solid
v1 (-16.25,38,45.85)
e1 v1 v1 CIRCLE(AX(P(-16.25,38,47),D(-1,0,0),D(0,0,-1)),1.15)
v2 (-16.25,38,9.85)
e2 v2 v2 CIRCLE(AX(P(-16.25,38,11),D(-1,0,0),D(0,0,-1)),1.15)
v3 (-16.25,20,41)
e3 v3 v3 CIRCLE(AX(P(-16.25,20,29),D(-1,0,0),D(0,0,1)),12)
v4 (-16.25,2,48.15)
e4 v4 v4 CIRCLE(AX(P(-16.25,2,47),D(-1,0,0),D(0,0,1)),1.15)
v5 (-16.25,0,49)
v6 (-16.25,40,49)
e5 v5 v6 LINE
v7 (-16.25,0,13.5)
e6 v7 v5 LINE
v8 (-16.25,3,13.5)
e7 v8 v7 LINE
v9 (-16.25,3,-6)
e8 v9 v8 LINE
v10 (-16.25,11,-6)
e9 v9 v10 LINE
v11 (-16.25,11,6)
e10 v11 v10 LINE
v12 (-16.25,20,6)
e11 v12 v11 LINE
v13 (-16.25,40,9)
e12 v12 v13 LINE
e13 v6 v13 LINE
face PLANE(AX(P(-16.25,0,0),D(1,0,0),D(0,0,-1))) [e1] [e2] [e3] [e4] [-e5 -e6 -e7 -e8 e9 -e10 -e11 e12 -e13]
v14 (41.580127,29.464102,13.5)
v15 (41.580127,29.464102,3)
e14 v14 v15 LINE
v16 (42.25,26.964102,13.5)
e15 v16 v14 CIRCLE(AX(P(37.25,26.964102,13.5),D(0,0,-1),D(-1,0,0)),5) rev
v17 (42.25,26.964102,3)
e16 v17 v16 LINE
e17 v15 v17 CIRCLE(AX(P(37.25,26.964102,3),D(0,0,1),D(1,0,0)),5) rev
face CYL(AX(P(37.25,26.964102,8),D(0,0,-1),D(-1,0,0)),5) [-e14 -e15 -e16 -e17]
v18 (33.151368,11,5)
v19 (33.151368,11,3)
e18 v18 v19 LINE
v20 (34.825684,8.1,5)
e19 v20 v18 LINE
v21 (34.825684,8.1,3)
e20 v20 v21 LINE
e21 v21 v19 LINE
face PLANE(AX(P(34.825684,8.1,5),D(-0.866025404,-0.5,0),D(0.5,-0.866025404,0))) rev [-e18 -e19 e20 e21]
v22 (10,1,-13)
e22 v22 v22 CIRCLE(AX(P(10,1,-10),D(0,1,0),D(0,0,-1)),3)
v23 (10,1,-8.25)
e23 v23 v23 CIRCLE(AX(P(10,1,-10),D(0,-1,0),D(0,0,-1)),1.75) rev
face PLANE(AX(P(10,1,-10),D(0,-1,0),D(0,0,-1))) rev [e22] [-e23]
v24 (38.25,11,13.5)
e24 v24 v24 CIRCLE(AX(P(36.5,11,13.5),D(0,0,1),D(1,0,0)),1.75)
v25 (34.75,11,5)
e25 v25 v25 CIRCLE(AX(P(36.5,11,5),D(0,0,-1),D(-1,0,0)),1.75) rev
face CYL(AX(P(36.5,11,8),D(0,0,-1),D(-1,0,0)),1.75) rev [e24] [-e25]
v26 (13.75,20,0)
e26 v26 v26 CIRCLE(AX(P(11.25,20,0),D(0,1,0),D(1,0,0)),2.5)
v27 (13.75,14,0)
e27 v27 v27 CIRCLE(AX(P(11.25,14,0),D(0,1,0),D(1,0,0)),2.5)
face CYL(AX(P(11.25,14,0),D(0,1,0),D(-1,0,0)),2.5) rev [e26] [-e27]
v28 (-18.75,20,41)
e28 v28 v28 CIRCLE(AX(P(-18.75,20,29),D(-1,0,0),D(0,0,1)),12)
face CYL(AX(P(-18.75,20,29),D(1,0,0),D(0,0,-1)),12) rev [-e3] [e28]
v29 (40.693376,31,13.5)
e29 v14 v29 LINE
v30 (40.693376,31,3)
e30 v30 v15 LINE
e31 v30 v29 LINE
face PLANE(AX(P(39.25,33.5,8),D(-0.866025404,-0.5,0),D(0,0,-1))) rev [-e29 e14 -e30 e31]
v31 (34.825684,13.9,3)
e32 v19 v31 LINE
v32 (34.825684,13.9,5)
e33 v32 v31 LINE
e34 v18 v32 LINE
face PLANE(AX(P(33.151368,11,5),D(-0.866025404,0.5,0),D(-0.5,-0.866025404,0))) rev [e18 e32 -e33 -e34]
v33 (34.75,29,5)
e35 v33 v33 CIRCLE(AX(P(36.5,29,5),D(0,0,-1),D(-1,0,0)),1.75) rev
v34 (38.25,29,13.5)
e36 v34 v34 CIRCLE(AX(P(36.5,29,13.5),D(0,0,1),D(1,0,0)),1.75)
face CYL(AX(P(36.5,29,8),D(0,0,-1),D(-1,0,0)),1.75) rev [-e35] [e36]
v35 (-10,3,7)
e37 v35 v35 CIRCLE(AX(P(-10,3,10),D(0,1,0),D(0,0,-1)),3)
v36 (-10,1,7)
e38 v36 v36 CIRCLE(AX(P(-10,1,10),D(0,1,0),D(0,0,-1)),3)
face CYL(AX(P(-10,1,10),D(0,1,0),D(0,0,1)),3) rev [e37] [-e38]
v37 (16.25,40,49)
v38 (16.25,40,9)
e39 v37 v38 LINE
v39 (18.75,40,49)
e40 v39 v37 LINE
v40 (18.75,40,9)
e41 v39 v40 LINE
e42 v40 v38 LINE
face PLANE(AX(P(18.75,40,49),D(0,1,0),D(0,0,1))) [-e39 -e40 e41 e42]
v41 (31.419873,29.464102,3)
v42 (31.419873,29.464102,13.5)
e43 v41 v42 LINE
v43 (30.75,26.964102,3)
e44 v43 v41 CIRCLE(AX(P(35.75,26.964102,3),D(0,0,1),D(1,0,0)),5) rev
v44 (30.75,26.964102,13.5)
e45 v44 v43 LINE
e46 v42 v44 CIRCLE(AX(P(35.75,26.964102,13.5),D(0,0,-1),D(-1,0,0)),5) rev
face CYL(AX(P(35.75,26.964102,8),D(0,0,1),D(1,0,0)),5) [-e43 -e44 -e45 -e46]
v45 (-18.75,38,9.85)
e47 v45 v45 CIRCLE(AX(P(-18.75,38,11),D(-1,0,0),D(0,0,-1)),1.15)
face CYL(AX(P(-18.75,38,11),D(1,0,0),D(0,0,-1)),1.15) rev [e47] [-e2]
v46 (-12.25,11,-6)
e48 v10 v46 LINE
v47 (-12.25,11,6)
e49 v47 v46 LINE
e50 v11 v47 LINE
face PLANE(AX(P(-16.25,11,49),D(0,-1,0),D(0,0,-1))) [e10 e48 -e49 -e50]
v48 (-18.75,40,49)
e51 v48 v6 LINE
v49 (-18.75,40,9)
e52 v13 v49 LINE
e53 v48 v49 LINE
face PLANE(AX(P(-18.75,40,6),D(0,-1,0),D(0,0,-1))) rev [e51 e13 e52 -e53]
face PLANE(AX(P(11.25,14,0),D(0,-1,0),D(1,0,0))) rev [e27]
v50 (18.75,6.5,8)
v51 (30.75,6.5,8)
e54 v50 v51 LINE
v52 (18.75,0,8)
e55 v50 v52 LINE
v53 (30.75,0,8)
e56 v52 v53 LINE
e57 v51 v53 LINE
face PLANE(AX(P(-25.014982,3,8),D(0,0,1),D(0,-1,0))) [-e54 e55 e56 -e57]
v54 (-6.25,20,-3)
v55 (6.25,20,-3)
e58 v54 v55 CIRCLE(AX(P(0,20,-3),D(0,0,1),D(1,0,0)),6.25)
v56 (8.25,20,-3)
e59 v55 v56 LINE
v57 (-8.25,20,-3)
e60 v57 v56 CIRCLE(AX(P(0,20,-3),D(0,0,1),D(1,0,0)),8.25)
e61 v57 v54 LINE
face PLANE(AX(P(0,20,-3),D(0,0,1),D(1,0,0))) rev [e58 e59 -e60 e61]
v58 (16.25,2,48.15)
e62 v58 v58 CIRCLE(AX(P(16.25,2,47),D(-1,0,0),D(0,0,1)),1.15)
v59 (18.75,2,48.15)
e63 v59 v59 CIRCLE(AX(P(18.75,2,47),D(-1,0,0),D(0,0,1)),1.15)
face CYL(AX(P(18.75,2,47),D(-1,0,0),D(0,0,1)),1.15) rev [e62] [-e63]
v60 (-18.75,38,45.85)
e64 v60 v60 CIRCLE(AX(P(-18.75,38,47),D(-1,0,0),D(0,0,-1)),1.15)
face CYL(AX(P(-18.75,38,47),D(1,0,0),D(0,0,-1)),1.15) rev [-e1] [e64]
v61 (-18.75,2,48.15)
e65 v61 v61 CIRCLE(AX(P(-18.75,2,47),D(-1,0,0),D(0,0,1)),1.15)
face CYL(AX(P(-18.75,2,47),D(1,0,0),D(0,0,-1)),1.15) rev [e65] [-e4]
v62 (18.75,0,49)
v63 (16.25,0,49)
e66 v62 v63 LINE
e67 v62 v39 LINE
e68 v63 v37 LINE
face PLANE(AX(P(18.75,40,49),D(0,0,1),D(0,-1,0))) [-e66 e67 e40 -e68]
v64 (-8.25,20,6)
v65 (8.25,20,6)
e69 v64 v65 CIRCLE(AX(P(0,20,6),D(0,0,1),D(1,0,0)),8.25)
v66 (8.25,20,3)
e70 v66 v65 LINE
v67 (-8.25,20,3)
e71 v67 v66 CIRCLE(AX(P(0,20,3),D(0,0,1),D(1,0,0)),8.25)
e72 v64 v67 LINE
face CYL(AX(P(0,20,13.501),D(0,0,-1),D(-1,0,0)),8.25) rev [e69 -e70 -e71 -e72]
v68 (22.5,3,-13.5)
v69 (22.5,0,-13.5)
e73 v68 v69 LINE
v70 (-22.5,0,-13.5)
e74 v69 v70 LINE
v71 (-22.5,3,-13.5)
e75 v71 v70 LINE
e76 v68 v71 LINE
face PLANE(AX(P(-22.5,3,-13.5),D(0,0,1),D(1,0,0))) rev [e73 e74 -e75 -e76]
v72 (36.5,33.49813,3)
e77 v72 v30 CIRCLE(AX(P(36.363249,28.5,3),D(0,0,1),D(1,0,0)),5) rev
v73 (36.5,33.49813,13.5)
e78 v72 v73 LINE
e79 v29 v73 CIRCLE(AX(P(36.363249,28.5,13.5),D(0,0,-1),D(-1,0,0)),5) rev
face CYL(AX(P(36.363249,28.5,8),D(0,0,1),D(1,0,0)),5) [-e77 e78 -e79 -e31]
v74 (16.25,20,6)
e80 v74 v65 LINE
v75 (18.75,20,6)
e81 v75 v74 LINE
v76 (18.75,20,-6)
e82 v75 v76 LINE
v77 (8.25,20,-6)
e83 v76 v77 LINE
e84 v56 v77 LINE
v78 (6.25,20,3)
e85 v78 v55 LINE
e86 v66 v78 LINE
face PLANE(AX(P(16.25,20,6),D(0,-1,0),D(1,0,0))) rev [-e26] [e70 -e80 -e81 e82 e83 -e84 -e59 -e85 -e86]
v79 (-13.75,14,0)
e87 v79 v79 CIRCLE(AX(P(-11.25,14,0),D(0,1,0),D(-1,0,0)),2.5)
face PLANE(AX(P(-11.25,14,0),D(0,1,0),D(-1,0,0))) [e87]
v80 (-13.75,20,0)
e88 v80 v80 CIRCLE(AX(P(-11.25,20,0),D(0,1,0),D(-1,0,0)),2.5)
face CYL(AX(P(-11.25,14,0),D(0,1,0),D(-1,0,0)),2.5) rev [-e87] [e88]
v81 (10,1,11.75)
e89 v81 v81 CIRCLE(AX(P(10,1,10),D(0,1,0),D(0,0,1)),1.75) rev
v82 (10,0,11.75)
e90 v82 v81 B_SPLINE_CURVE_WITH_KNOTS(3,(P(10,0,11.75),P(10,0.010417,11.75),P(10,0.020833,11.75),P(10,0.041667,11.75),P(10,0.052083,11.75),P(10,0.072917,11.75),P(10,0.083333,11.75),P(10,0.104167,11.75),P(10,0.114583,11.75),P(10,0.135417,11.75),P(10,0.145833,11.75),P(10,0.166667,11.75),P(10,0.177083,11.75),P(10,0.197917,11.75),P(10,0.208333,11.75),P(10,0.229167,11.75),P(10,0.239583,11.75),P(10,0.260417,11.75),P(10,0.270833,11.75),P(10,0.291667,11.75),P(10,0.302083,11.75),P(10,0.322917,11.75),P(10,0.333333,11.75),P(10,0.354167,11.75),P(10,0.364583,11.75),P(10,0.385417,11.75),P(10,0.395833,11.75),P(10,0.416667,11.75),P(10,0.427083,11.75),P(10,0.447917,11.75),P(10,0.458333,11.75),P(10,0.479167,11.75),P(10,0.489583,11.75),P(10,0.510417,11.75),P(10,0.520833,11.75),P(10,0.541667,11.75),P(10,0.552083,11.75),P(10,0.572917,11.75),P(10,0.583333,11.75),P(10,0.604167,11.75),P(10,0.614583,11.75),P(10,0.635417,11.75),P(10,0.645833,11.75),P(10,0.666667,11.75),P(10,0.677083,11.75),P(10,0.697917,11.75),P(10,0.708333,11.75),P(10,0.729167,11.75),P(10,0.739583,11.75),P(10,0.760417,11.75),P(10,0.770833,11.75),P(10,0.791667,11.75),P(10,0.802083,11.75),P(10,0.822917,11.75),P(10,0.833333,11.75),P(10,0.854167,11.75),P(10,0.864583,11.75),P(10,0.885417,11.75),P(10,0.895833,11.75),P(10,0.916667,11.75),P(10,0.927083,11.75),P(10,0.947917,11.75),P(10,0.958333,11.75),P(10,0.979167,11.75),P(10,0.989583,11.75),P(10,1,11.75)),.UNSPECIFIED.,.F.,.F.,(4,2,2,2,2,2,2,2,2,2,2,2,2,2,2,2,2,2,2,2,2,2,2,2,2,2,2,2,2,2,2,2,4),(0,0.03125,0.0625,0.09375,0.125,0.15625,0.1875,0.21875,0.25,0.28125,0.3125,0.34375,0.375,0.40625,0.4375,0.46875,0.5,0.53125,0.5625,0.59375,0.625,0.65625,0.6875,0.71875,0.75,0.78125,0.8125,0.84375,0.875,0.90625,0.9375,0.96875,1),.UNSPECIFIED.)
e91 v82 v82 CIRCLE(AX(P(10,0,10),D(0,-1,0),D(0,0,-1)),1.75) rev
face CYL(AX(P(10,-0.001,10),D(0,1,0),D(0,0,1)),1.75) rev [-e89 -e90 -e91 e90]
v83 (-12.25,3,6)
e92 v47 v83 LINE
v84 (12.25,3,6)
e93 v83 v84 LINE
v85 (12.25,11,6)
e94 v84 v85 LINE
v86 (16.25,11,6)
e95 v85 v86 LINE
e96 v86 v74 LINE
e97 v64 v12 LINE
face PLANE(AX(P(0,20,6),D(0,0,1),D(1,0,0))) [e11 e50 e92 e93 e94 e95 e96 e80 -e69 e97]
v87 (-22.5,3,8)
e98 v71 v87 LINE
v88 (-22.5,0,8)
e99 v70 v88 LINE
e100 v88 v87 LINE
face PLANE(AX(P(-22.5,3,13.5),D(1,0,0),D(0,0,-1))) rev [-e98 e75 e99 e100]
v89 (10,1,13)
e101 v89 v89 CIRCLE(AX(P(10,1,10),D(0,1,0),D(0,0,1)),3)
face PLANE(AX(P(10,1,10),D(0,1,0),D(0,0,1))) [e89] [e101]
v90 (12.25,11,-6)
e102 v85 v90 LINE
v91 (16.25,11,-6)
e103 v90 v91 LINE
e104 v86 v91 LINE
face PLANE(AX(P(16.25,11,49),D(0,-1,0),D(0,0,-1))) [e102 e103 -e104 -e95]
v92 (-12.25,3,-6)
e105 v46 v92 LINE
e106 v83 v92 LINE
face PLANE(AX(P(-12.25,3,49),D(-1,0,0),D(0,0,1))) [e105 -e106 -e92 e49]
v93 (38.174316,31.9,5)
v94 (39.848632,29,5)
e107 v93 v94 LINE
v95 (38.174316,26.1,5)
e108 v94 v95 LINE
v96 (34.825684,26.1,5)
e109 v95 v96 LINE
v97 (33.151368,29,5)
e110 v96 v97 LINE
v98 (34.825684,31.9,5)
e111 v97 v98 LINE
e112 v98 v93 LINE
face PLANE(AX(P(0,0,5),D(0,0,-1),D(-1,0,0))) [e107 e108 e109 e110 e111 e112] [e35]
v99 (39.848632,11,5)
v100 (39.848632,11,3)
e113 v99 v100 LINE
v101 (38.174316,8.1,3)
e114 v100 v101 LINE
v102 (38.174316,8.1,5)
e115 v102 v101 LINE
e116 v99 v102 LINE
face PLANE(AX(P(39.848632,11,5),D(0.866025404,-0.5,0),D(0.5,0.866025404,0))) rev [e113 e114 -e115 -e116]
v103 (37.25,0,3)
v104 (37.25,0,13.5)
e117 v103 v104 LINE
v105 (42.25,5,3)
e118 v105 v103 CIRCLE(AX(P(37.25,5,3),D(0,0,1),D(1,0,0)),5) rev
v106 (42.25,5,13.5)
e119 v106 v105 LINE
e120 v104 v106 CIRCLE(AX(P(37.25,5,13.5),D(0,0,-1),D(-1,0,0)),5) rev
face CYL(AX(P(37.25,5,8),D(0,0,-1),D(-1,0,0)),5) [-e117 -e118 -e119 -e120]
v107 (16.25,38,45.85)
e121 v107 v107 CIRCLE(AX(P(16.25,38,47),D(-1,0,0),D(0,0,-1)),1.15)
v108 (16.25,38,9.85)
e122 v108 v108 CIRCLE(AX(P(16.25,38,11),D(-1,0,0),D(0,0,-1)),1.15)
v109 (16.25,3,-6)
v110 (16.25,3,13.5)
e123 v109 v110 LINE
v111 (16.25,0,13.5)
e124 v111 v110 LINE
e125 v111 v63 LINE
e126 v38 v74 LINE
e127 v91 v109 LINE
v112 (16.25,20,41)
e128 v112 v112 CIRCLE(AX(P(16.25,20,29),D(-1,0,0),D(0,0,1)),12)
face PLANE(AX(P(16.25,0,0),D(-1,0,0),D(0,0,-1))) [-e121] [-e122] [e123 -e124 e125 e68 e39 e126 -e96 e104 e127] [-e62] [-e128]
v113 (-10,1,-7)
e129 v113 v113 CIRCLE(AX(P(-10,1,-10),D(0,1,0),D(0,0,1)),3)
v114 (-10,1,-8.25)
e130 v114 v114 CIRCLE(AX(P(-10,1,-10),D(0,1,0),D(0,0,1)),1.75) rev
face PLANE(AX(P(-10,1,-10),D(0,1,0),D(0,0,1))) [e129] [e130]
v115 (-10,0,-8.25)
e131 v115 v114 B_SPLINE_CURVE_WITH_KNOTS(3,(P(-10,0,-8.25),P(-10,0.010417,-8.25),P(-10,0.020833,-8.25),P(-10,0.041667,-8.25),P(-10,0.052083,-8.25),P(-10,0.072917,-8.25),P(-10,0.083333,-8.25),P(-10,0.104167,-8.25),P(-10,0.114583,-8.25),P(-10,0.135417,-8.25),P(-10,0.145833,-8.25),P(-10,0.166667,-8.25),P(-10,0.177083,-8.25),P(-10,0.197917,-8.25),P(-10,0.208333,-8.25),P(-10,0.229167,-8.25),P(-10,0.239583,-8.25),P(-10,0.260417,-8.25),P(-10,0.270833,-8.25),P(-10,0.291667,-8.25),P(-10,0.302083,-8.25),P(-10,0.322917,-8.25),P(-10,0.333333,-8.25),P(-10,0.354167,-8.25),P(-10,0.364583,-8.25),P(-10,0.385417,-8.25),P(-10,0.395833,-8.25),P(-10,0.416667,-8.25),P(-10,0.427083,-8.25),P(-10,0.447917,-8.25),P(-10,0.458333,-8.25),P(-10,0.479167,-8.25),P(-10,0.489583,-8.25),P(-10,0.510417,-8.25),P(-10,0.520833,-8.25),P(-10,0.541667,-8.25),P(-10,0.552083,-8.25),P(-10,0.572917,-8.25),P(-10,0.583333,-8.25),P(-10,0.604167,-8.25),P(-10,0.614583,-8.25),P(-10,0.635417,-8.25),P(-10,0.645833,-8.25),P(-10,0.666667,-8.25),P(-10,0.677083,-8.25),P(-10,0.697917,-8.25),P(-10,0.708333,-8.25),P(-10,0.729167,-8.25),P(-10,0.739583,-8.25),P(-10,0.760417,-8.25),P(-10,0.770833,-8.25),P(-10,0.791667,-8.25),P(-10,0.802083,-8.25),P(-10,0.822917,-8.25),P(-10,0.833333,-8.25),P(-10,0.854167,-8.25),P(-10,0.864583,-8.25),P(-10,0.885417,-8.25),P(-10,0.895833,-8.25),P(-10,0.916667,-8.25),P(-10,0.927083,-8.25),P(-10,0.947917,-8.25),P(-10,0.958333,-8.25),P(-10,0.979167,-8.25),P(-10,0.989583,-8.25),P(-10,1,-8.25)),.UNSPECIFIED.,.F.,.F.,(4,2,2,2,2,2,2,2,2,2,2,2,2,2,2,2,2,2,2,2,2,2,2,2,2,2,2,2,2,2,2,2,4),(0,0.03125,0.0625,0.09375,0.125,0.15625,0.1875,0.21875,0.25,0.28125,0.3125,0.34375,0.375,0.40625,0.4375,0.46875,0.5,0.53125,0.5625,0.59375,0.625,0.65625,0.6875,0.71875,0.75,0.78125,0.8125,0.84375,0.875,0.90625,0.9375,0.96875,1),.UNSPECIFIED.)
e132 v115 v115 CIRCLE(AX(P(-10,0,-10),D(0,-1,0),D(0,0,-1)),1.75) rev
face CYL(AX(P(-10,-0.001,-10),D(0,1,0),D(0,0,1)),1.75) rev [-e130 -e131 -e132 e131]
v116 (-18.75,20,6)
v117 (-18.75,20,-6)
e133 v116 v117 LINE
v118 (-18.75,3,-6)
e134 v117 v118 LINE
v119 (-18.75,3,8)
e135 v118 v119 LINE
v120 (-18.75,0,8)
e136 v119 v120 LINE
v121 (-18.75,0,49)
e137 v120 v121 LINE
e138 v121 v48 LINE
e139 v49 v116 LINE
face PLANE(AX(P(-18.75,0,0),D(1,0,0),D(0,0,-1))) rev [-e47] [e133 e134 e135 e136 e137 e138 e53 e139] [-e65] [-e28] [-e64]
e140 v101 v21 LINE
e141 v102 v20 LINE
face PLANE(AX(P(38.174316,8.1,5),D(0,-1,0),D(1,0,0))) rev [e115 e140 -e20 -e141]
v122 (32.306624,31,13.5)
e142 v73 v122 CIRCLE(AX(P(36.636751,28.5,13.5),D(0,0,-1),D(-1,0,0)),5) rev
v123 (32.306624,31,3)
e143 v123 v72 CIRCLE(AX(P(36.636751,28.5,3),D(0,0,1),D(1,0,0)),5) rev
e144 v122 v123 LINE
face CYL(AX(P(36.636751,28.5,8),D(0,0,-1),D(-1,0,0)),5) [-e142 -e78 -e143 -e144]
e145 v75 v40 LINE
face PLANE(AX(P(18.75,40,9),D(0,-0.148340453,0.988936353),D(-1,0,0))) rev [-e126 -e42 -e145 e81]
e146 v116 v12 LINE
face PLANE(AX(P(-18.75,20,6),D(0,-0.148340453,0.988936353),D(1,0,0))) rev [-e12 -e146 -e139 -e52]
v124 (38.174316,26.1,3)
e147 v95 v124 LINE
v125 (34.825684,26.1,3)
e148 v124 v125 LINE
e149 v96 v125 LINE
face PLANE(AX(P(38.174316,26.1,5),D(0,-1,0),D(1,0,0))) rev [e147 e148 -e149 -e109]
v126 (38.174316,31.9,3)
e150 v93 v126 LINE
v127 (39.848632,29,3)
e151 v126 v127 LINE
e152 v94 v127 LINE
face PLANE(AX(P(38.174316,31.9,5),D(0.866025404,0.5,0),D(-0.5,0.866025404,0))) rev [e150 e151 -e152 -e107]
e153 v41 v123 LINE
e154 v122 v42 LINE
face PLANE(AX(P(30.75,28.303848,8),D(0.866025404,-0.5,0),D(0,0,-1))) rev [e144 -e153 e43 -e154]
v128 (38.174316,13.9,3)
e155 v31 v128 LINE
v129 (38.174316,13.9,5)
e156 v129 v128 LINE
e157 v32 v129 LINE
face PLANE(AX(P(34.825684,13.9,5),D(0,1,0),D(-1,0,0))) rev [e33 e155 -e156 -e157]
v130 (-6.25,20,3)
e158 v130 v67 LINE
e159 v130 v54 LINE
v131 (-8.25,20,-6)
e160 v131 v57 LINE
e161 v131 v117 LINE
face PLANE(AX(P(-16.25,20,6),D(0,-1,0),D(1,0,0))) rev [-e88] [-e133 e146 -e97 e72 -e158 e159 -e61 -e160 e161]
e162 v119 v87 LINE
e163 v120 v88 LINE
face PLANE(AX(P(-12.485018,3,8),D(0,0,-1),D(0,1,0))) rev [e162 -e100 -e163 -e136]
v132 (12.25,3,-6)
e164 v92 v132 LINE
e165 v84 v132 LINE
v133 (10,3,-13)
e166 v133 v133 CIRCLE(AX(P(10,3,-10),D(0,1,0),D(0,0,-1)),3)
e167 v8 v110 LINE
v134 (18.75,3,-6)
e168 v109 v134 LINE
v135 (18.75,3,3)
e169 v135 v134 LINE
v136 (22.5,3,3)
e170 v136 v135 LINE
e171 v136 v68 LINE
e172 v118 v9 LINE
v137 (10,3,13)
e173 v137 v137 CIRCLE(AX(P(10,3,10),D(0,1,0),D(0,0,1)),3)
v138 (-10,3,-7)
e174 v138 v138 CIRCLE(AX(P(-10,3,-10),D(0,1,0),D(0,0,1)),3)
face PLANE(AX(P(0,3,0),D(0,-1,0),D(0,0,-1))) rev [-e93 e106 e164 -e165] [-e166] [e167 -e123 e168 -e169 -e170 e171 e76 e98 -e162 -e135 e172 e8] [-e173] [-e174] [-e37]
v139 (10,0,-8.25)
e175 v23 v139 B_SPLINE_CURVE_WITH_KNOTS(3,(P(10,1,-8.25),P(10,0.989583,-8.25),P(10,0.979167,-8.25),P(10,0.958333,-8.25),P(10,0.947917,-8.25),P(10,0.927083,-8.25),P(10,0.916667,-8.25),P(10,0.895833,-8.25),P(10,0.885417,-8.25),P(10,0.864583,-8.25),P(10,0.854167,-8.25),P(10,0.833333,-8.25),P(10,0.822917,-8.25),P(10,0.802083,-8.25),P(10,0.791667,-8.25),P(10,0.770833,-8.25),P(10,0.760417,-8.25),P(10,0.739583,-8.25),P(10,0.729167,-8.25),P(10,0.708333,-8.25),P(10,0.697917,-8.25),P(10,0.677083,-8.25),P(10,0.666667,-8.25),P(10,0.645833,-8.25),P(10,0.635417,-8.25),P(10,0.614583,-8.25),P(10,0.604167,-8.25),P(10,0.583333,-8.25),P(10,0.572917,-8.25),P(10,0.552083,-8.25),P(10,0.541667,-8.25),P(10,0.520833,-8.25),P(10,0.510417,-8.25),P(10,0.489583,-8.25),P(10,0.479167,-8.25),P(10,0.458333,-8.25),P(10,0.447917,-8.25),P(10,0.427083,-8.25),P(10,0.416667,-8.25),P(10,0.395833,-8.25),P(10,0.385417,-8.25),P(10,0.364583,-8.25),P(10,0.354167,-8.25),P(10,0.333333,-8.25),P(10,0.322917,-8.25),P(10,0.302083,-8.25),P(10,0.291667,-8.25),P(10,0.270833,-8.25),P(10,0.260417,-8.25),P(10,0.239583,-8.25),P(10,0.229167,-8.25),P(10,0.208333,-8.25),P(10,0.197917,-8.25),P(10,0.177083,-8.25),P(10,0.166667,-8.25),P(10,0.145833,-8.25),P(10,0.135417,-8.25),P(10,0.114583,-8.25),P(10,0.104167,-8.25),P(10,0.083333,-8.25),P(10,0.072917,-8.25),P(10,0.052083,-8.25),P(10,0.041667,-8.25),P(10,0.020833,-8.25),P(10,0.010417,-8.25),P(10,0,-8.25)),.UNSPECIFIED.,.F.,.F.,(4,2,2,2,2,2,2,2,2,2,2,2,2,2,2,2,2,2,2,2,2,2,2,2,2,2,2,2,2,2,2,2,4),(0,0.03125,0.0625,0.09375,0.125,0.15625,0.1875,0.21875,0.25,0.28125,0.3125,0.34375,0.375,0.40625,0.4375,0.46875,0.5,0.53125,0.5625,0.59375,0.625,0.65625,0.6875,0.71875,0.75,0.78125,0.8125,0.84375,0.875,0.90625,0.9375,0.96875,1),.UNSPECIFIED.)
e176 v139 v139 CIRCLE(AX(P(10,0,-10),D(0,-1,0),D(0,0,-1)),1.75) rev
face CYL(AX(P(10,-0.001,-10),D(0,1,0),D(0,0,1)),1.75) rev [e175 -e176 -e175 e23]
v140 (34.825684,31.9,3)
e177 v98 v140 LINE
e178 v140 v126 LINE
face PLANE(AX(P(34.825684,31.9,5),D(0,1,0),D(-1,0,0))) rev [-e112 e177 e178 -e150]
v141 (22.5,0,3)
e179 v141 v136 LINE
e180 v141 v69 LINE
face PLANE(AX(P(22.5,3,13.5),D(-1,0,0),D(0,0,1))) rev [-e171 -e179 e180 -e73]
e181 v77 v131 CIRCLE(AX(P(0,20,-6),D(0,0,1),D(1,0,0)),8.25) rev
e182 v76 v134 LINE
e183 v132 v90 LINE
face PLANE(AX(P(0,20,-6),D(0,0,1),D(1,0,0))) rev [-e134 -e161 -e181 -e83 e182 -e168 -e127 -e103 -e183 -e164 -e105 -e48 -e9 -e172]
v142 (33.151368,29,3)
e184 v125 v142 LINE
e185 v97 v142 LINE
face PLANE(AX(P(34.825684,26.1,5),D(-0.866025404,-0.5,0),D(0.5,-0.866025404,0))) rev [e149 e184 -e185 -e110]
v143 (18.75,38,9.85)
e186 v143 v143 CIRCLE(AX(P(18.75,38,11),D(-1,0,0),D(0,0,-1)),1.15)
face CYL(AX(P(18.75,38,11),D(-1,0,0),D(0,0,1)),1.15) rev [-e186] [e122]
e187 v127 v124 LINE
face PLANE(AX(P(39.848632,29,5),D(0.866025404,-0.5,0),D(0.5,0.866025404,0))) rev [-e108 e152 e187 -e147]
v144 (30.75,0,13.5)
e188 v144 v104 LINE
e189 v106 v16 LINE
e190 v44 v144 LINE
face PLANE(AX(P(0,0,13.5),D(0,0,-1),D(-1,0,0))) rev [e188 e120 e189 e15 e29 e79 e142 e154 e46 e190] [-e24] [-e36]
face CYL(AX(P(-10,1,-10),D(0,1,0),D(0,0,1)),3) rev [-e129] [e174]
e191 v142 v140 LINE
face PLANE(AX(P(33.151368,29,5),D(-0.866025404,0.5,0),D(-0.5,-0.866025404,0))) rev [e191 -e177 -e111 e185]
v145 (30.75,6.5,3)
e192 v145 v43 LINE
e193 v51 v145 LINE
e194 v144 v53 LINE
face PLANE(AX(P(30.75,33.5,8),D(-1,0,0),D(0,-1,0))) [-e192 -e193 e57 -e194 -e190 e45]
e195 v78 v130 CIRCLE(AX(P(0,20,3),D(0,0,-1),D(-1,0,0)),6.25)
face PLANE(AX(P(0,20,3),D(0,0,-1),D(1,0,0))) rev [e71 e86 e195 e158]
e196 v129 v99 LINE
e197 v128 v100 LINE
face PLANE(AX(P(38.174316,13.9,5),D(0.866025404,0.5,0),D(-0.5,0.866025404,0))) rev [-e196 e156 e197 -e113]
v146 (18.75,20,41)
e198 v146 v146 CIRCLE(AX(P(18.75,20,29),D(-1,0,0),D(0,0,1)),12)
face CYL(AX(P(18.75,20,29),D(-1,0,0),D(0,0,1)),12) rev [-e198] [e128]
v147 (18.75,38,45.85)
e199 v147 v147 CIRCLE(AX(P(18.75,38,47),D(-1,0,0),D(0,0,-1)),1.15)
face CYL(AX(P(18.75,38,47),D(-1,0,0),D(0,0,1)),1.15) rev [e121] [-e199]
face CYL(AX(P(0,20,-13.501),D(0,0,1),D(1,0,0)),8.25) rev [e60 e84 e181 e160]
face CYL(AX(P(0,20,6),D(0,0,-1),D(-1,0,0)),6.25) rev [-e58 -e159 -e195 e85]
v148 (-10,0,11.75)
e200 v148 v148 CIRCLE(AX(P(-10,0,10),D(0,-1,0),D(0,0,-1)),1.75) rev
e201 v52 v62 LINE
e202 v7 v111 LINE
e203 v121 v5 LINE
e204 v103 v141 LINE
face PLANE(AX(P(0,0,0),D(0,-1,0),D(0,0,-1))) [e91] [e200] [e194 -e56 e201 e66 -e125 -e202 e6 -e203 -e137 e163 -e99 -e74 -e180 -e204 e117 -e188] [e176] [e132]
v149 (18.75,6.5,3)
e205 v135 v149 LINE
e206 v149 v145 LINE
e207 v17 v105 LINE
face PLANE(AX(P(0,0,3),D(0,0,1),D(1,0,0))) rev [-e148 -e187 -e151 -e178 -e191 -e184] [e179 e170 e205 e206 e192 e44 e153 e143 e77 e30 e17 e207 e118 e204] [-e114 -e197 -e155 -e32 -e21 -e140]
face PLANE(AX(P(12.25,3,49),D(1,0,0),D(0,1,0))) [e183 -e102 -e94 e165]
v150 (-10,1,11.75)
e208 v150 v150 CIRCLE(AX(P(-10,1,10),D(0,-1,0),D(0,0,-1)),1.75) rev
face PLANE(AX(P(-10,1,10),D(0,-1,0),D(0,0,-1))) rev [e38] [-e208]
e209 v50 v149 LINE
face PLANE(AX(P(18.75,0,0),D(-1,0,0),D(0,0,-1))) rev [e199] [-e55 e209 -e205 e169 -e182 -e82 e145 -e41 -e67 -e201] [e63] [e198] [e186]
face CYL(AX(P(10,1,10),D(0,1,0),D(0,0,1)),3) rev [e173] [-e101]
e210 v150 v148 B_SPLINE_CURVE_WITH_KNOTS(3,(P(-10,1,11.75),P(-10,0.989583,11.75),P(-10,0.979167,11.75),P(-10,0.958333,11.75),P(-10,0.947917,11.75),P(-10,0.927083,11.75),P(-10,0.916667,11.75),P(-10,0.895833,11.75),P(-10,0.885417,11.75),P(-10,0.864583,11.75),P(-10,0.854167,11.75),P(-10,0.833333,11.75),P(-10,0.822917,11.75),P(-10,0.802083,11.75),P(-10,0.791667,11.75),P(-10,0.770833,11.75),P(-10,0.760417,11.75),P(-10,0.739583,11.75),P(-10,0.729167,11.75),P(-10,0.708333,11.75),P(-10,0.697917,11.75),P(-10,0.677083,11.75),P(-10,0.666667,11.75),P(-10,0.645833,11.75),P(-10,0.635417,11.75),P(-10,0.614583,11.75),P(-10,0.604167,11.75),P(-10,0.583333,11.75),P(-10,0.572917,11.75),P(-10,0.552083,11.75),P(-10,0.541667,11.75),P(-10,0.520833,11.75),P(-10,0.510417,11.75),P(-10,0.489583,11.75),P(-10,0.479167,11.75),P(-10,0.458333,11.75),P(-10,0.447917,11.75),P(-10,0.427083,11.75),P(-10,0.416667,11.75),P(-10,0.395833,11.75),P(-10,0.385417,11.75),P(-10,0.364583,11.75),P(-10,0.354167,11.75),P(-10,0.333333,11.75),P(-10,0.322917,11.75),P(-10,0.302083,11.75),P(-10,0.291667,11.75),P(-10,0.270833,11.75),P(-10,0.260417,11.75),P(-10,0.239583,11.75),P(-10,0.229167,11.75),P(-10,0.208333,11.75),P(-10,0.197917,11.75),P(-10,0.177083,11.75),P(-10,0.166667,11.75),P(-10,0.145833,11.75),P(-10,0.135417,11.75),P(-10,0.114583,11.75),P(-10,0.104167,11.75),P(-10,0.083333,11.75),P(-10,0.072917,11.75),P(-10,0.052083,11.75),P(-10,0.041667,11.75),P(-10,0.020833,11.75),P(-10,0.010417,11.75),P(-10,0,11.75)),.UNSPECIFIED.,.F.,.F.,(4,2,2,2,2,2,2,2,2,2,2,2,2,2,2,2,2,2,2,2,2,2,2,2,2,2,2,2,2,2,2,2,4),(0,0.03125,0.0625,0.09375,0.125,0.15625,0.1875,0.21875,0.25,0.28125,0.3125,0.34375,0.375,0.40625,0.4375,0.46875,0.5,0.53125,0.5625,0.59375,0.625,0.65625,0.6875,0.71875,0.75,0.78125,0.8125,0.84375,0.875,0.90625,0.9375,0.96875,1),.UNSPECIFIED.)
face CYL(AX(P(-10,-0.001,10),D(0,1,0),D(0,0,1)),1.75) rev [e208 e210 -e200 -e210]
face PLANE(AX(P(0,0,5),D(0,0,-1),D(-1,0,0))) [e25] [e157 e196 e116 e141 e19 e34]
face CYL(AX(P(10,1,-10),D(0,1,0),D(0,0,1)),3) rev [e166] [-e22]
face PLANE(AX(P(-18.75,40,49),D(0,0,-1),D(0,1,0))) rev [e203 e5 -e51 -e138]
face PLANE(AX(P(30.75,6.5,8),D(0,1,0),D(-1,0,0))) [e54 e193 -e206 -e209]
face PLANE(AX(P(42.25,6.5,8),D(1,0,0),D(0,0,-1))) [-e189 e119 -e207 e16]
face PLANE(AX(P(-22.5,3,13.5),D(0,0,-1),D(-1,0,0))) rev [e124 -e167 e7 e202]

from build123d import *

# Parameters (mm, degrees)
SKETCH1_W                       = 45
SKETCH1_H                       = 27
BOSS_EXTRUDE1_DEPTH             = 3
CUT_EXTRUDE1_REACH              = 28.41
SKETCH2_R                       = 1.75
SKETCH3_R                       = 3
CUT_EXTRUDE2_DEPTH              = 2
BOSS_EXTRUDE2_DEPTH             = 6
CUT_EXTRUDE6_REACH              = 37.992
CUT_EXTRUDE6_START              = -3
SKETCH12_R                      = 8.25
SKETCH15_R                      = 2.5
CUT_EXTRUDE7_DEPTH              = 6
SKETCH16_R                      = 1.15
SKETCH16_R_2                    = 12
BOSS_EXTRUDE5_DEPTH             = 2.5
CUT_EXTRUDE8_START              = -3.75
SKETCH17_W                      = 5.5
SKETCH17_H                      = 3
CUT_EXTRUDE8_DEPTH              = 82.37731478
BOSS_EXTRUDE6_START             = -9
SKETCH18_R                      = 1.75
BOSS_EXTRUDE6_DEPTH             = 5
SKETCH21_W                      = 11.5
SKETCH21_H                      = 33.5
SKETCH21_R                      = 1.75
BOSS_EXTRUDE7_DEPTH             = 5.5
CUT_EXTRUDE9_DEPTH              = 2
CHAMFER1_SIZE                   = 3
CHAMFER1_SIZE2                  = 5.196152423
FILLET1_R                       = 5
CUT_EXTRUDE10_REACH             = 74.347
SKETCH20_W                      = 4
SKETCH20_H                      = 8
CUT_EXTRUDE10_DIRECTION_2_DEPTH = 73.346820939
CHAMFER2_SIZE2                  = 3
CHAMFER2_SIZE                   = 20
CHAMFER3_SIZE2                  = 20
CHAMFER3_SIZE                   = 3


# Some blends are built 0.0001 mm under size
with BuildPart() as part:
    # Sketch1 → Boss-Extrude1 (new body)
    with BuildSketch(Plane(origin=(0, 0, 0), x_dir=(1, 0, 0), z_dir=(0, 1, 0))):
        Rectangle(SKETCH1_W, SKETCH1_H)
    extrude(amount=BOSS_EXTRUDE1_DEPTH)

    # Sketch2 → Cut-Extrude1 (cut, up to next)
    with BuildSketch(Plane(origin=(0, 3, 0), x_dir=(1, 0, 0), z_dir=(0, 1, 0)), mode=Mode.PRIVATE) as cut_extrude1_sk1:
        with Locations(Location((-10, 10, 0), (0, 0, 270))):
            Circle(SKETCH2_R)
    cut_extrude1_tool1 = extrude(cut_extrude1_sk1.sketch, amount=-CUT_EXTRUDE1_REACH, mode=Mode.PRIVATE) & part.part
    # Sketch2 → Cut-Extrude1 (cut, up to next)
    with BuildSketch(Plane(origin=(0, 3, 0), x_dir=(1, 0, 0), z_dir=(0, 1, 0)), mode=Mode.PRIVATE) as cut_extrude1_sk2:
        with Locations(Location((10, 10, 0), (0, 0, 270))):
            Circle(SKETCH2_R)
    cut_extrude1_tool2 = extrude(cut_extrude1_sk2.sketch, amount=-CUT_EXTRUDE1_REACH, mode=Mode.PRIVATE) & part.part
    # Sketch2 → Cut-Extrude1 (cut, up to next)
    with BuildSketch(Plane(origin=(0, 3, 0), x_dir=(1, 0, 0), z_dir=(0, 1, 0)), mode=Mode.PRIVATE) as cut_extrude1_sk3:
        with Locations(Location((10, -10, 0), (0, 0, 270))):
            Circle(SKETCH2_R)
    cut_extrude1_tool3 = extrude(cut_extrude1_sk3.sketch, amount=-CUT_EXTRUDE1_REACH, mode=Mode.PRIVATE) & part.part
    # Sketch2 → Cut-Extrude1 (cut, up to next)
    with BuildSketch(Plane(origin=(0, 3, 0), x_dir=(1, 0, 0), z_dir=(0, 1, 0)), mode=Mode.PRIVATE) as cut_extrude1_sk4:
        with Locations(Location((-10, -10, 0), (0, 0, 270))):
            Circle(SKETCH2_R)
    cut_extrude1_tool4 = extrude(cut_extrude1_sk4.sketch, amount=-CUT_EXTRUDE1_REACH, mode=Mode.PRIVATE) & part.part
    add(cut_extrude1_tool1.solids().sort_by_distance((-10, 3, -10))[0], mode=Mode.SUBTRACT)
    add(cut_extrude1_tool2.solids().sort_by_distance((10, 3, -10))[0], mode=Mode.SUBTRACT)
    add(cut_extrude1_tool3.solids().sort_by_distance((10, 3, 10))[0], mode=Mode.SUBTRACT)
    add(cut_extrude1_tool4.solids().sort_by_distance((-10, 3, 10))[0], mode=Mode.SUBTRACT)

    # Sketch3 → Cut-Extrude2 (cut)
    with BuildSketch(Plane(origin=(0, 3, 0), x_dir=(1, 0, 0), z_dir=(0, 1, 0))):
        with Locations(Location((-10, 10, 0), (0, 0, 270))):
            Circle(SKETCH3_R)
        with Locations(Location((10, 10, 0), (0, 0, 90))):
            Circle(SKETCH3_R)
        with Locations(Location((10, -10, 0), (0, 0, 270))):
            Circle(SKETCH3_R)
        with Locations(Location((-10, -10, 0), (0, 0, 90))):
            Circle(SKETCH3_R)
    extrude(amount=-CUT_EXTRUDE2_DEPTH, mode=Mode.SUBTRACT)

    # Sketch5 → Boss-Extrude2 (add, symmetric)
    with BuildSketch(Plane.XY):
        with BuildLine():
            Line((16.25, 3), (-16.25, 3))
            Line((-16.25, 3), (-16.25, 20))
            Line((-16.25, 20), (-6.25, 20))
            ThreePointArc((-6.25, 20), (0, 13.75), (6.25, 20))
            Line((6.25, 20), (16.25, 20))
            Line((16.25, 20), (16.25, 3))
        make_face()
    extrude(amount=BOSS_EXTRUDE2_DEPTH, both=True)

    # Sketch12 → Cut-Extrude6 (cut, up to next)
    with BuildSketch(Plane.XY.offset(CUT_EXTRUDE6_START), mode=Mode.PRIVATE) as cut_extrude6_sk1:
        with Locations((0, 20)):
            Circle(SKETCH12_R)
    cut_extrude6_tool1 = extrude(cut_extrude6_sk1.sketch, amount=-CUT_EXTRUDE6_REACH, mode=Mode.PRIVATE) & part.part
    cut_extrude6 = cut_extrude6_tool1.solids().sort_by_distance((0, 20, -3))[0]
    add(cut_extrude6, mode=Mode.SUBTRACT)

    # Mirror1: Cut-Extrude6 across plane
    add(cut_extrude6.mirror(Plane.XY), mode=Mode.SUBTRACT)

    # Sketch15 → Cut-Extrude7 (cut)
    with BuildSketch(Plane(origin=(0, 20, 0), x_dir=(1, 0, 0), z_dir=(0, 1, 0))):
        with Locations(Location((-11.25, 0, 0), (0, 0, 180))):
            Circle(SKETCH15_R)
        with Locations((11.25, 0)):
            Circle(SKETCH15_R)
    extrude(amount=-CUT_EXTRUDE7_DEPTH, mode=Mode.SUBTRACT)

    # Sketch16 → Boss-Extrude5 (add)
    with BuildSketch(Plane.ZY.offset(16.25)):
        Polygon((9, 3), (9, 0), (49, 0), (49, 40), (9, 40), (6, 40), (6, 20), (-6, 20), (-6, 3), align=None)
        with Locations((47, 2)):
            Circle(SKETCH16_R, mode=Mode.SUBTRACT)
        with Locations(Location((47, 38, 0), (0, 0, 180))):
            Circle(SKETCH16_R, mode=Mode.SUBTRACT)
        with Locations(Location((11, 38, 0), (0, 0, 180))):
            Circle(SKETCH16_R, mode=Mode.SUBTRACT)
        with Locations((29, 20)):
            Circle(SKETCH16_R_2, mode=Mode.SUBTRACT)
    boss_extrude5 = extrude(amount=BOSS_EXTRUDE5_DEPTH)

    # Sketch17 → Cut-Extrude8 (cut)
    with BuildSketch(Plane.ZY.offset(22.5).offset(CUT_EXTRUDE8_START)):
        with Locations((10.75, 1.5)):
            Rectangle(SKETCH17_W, SKETCH17_H)
    cut_extrude8 = extrude(amount=CUT_EXTRUDE8_DEPTH, mode=Mode.SUBTRACT)

    # Mirror2: Boss-Extrude5, Cut-Extrude8 across plane
    add(boss_extrude5.mirror(Plane(origin=(0, 0, 0), x_dir=(0, 0, 1), z_dir=(1, 0, 0))))
    add(cut_extrude8.mirror(Plane(origin=(0, 0, 0), x_dir=(0, 0, 1), z_dir=(1, 0, 0))), mode=Mode.SUBTRACT)

    # Sketch18 → Boss-Extrude6 (add)
    with BuildSketch(Plane(origin=(0, 0, -6), x_dir=(-1, 0, 0), z_dir=(0, 0, -1)).offset(BOSS_EXTRUDE6_START)):
        Polygon((-42.25, 33.5), (-30.75, 33.5), (-30.75, 6.5), (-18.75, 6.5), (-18.75, 0), (-42.25, 0), (-42.25, 6.5), align=None)
        with Locations((-36.5, 29)):
            Circle(SKETCH18_R, mode=Mode.SUBTRACT)
        with Locations(Location((-36.5, 11, 0), (0, 0, 180))):
            Circle(SKETCH18_R, mode=Mode.SUBTRACT)
    extrude(amount=-BOSS_EXTRUDE6_DEPTH)

    # Sketch21 → Boss-Extrude7 (add)
    with BuildSketch(Plane.XY.offset(8)):
        with Locations((36.5, 16.75)):
            Rectangle(SKETCH21_W, SKETCH21_H)
        with Locations(Location((36.5, 29, 0), (0, 0, 180))):
            Circle(SKETCH21_R, mode=Mode.SUBTRACT)
        with Locations((36.5, 11)):
            Circle(SKETCH21_R, mode=Mode.SUBTRACT)
    extrude(amount=BOSS_EXTRUDE7_DEPTH)

    # Sketch19 → Cut-Extrude9 (cut)
    with BuildSketch(Plane(origin=(0, 0, 3), x_dir=(-1, 0, 0), z_dir=(0, 0, -1))):
        Polygon((-39.848631561, 11), (-38.174315781, 8.1), (-34.825684219, 8.1), (-33.151368439, 11), (-34.825684219, 13.9), (-38.174315781, 13.9), align=None)
        Polygon((-39.848631561, 29), (-38.174315781, 26.1), (-34.825684219, 26.1), (-33.151368439, 29), (-34.825684219, 31.9), (-38.174315781, 31.9), align=None)
    extrude(amount=-CUT_EXTRUDE9_DEPTH, mode=Mode.SUBTRACT)

    # Chamfer1
    chamfer1_edges = [part.edges().sort_by_distance(p)[0] for p in [
        (42.25, 33.5, 8.25),
        (30.75, 33.5, 8.25),
    ]]
    chamfer1_side = [part.faces().sort_by_distance(p)[0] for p in [
        (36.5, 33.5, 8.25),
    ]]
    chamfer(chamfer1_edges, length=CHAMFER1_SIZE, length2=CHAMFER1_SIZE2, reference=chamfer1_side[0])

    # Fillet1
    # the kernel refuses this fillet: 5 mm, written as the material it takes off along each edge
    with BuildSketch(Plane(origin=(42.25, 0, -9.5), x_dir=(-1, 0, 0), z_dir=(0, 0, 1))) as fillet1_piece_1:
        with BuildLine():
            CenterArc((FILLET1_R, -FILLET1_R), FILLET1_R, 90, 90)
            Line((0, -FILLET1_R), (0, 0))
            Line((0, 0), (FILLET1_R, 0))
        make_face()
    extrude(amount=35.5, mode=Mode.SUBTRACT)
    with BuildSketch(Plane(origin=(42.25, 28.303847577, -0.349364905), x_dir=(-0.4999999999999988, 0.8660254037844394, 0), z_dir=(0, 0, 1))) as fillet1_piece_2:
        with BuildLine():
            CenterArc((FILLET1_R * 0.267949192431, FILLET1_R), FILLET1_R, 240, 30)
            Line((-FILLET1_R * 0.232050807569, FILLET1_R * 0.133974596216), (0, 0))
            Line((0, 0), (FILLET1_R * 0.267949192431, 0))
        make_face()
    extrude(amount=17.198729811, mode=Mode.SUBTRACT)
    with BuildSketch(Plane(origin=(30.75, 28.303847577, 16.849364905), x_dir=(0, -1, 0), z_dir=(0, 0, -1))) as fillet1_piece_3:
        with BuildLine():
            CenterArc((FILLET1_R * 0.267949192431, -FILLET1_R), FILLET1_R, 90, 30)
            Line((-FILLET1_R * 0.232050807569, -FILLET1_R * 0.133974596216), (0, 0))
            Line((0, 0), (FILLET1_R * 0.267949192431, 0))
        make_face()
    extrude(amount=17.198729811, mode=Mode.SUBTRACT)
    with BuildSketch(Plane(origin=(39.25, 33.5, -4.216878365), x_dir=(-1, 0, 0), z_dir=(0, 0, 1))) as fillet1_piece_4:
        with BuildLine():
            CenterArc((FILLET1_R * 0.57735026919, FILLET1_R), FILLET1_R, 210, 60)
            Line((-FILLET1_R * 0.288675134595, FILLET1_R * 0.5), (0, 0))
            Line((0, 0), (FILLET1_R * 0.57735026919, 0))
        make_face()
    extrude(amount=24.93375673, mode=Mode.SUBTRACT)
    with BuildSketch(Plane(origin=(33.75, 33.5, 20.716878365), x_dir=(-0.4999999999999974, -0.86602540378444, 0), z_dir=(0, 0, -1))) as fillet1_piece_5:
        with BuildLine():
            CenterArc((FILLET1_R * 0.57735026919, -FILLET1_R), FILLET1_R, 90, 60)
            Line((-FILLET1_R * 0.288675134595, -FILLET1_R * 0.5), (0, 0))
            Line((0, 0), (FILLET1_R * 0.57735026919, 0))
        make_face()
    extrude(amount=24.93375673, mode=Mode.SUBTRACT)

    # Sketch20 → Cut-Extrude10 (cut, up to next)
    with BuildSketch(Plane.XY.offset(6), mode=Mode.PRIVATE) as cut_extrude10_sk1:
        with Locations((-14.25, 7)):
            Rectangle(SKETCH20_W, SKETCH20_H)
    cut_extrude10_tool1 = extrude(cut_extrude10_sk1.sketch, amount=-CUT_EXTRUDE10_REACH, mode=Mode.PRIVATE) & part.part
    # Sketch20 → Cut-Extrude10 (cut, up to next)
    with BuildSketch(Plane.XY.offset(6), mode=Mode.PRIVATE) as cut_extrude10_sk2:
        with Locations((14.25, 7)):
            Rectangle(SKETCH20_W, SKETCH20_H)
    cut_extrude10_tool2 = extrude(cut_extrude10_sk2.sketch, amount=-CUT_EXTRUDE10_REACH, mode=Mode.PRIVATE) & part.part
    add(cut_extrude10_tool1.solids().sort_by_distance((-14.25, 7, 6))[0], mode=Mode.SUBTRACT)
    add(cut_extrude10_tool2.solids().sort_by_distance((14.25, 7, 6))[0], mode=Mode.SUBTRACT)

    # Sketch20 → Cut-Extrude10 direction 2 (cut)
    with BuildSketch(Plane.XY.offset(6)):
        with Locations((-14.25, 7)):
            Rectangle(SKETCH20_W, SKETCH20_H)
        with Locations((14.25, 7)):
            Rectangle(SKETCH20_W, SKETCH20_H)
    extrude(amount=CUT_EXTRUDE10_DIRECTION_2_DEPTH, mode=Mode.SUBTRACT)

    # Chamfer2
    chamfer2_edges = [part.edges().sort_by_distance(p)[0] for p in [
        (-17.5, 40, 6),
    ]]
    chamfer2_side = [part.faces().sort_by_distance(p)[0] for p in [
        (-17.5, 39.94, 6),
    ]]
    chamfer(chamfer2_edges, length=CHAMFER2_SIZE - 0.0001, length2=CHAMFER2_SIZE2 - 0.0001, reference=chamfer2_side[0])  # a hair under: the kernel refuses the full size

    # Chamfer3
    chamfer3_edges = [part.edges().sort_by_distance(p)[0] for p in [
        (17.5, 40, 6),
    ]]
    chamfer3_side = [part.faces().sort_by_distance(p)[0] for p in [
        (17.5, 40, 6.06),
    ]]
    chamfer(chamfer3_edges, length=CHAMFER3_SIZE - 0.0001, length2=CHAMFER3_SIZE2 - 0.0001, reference=chamfer3_side[0])  # a hair under: the kernel refuses the full size


solid = part.part
